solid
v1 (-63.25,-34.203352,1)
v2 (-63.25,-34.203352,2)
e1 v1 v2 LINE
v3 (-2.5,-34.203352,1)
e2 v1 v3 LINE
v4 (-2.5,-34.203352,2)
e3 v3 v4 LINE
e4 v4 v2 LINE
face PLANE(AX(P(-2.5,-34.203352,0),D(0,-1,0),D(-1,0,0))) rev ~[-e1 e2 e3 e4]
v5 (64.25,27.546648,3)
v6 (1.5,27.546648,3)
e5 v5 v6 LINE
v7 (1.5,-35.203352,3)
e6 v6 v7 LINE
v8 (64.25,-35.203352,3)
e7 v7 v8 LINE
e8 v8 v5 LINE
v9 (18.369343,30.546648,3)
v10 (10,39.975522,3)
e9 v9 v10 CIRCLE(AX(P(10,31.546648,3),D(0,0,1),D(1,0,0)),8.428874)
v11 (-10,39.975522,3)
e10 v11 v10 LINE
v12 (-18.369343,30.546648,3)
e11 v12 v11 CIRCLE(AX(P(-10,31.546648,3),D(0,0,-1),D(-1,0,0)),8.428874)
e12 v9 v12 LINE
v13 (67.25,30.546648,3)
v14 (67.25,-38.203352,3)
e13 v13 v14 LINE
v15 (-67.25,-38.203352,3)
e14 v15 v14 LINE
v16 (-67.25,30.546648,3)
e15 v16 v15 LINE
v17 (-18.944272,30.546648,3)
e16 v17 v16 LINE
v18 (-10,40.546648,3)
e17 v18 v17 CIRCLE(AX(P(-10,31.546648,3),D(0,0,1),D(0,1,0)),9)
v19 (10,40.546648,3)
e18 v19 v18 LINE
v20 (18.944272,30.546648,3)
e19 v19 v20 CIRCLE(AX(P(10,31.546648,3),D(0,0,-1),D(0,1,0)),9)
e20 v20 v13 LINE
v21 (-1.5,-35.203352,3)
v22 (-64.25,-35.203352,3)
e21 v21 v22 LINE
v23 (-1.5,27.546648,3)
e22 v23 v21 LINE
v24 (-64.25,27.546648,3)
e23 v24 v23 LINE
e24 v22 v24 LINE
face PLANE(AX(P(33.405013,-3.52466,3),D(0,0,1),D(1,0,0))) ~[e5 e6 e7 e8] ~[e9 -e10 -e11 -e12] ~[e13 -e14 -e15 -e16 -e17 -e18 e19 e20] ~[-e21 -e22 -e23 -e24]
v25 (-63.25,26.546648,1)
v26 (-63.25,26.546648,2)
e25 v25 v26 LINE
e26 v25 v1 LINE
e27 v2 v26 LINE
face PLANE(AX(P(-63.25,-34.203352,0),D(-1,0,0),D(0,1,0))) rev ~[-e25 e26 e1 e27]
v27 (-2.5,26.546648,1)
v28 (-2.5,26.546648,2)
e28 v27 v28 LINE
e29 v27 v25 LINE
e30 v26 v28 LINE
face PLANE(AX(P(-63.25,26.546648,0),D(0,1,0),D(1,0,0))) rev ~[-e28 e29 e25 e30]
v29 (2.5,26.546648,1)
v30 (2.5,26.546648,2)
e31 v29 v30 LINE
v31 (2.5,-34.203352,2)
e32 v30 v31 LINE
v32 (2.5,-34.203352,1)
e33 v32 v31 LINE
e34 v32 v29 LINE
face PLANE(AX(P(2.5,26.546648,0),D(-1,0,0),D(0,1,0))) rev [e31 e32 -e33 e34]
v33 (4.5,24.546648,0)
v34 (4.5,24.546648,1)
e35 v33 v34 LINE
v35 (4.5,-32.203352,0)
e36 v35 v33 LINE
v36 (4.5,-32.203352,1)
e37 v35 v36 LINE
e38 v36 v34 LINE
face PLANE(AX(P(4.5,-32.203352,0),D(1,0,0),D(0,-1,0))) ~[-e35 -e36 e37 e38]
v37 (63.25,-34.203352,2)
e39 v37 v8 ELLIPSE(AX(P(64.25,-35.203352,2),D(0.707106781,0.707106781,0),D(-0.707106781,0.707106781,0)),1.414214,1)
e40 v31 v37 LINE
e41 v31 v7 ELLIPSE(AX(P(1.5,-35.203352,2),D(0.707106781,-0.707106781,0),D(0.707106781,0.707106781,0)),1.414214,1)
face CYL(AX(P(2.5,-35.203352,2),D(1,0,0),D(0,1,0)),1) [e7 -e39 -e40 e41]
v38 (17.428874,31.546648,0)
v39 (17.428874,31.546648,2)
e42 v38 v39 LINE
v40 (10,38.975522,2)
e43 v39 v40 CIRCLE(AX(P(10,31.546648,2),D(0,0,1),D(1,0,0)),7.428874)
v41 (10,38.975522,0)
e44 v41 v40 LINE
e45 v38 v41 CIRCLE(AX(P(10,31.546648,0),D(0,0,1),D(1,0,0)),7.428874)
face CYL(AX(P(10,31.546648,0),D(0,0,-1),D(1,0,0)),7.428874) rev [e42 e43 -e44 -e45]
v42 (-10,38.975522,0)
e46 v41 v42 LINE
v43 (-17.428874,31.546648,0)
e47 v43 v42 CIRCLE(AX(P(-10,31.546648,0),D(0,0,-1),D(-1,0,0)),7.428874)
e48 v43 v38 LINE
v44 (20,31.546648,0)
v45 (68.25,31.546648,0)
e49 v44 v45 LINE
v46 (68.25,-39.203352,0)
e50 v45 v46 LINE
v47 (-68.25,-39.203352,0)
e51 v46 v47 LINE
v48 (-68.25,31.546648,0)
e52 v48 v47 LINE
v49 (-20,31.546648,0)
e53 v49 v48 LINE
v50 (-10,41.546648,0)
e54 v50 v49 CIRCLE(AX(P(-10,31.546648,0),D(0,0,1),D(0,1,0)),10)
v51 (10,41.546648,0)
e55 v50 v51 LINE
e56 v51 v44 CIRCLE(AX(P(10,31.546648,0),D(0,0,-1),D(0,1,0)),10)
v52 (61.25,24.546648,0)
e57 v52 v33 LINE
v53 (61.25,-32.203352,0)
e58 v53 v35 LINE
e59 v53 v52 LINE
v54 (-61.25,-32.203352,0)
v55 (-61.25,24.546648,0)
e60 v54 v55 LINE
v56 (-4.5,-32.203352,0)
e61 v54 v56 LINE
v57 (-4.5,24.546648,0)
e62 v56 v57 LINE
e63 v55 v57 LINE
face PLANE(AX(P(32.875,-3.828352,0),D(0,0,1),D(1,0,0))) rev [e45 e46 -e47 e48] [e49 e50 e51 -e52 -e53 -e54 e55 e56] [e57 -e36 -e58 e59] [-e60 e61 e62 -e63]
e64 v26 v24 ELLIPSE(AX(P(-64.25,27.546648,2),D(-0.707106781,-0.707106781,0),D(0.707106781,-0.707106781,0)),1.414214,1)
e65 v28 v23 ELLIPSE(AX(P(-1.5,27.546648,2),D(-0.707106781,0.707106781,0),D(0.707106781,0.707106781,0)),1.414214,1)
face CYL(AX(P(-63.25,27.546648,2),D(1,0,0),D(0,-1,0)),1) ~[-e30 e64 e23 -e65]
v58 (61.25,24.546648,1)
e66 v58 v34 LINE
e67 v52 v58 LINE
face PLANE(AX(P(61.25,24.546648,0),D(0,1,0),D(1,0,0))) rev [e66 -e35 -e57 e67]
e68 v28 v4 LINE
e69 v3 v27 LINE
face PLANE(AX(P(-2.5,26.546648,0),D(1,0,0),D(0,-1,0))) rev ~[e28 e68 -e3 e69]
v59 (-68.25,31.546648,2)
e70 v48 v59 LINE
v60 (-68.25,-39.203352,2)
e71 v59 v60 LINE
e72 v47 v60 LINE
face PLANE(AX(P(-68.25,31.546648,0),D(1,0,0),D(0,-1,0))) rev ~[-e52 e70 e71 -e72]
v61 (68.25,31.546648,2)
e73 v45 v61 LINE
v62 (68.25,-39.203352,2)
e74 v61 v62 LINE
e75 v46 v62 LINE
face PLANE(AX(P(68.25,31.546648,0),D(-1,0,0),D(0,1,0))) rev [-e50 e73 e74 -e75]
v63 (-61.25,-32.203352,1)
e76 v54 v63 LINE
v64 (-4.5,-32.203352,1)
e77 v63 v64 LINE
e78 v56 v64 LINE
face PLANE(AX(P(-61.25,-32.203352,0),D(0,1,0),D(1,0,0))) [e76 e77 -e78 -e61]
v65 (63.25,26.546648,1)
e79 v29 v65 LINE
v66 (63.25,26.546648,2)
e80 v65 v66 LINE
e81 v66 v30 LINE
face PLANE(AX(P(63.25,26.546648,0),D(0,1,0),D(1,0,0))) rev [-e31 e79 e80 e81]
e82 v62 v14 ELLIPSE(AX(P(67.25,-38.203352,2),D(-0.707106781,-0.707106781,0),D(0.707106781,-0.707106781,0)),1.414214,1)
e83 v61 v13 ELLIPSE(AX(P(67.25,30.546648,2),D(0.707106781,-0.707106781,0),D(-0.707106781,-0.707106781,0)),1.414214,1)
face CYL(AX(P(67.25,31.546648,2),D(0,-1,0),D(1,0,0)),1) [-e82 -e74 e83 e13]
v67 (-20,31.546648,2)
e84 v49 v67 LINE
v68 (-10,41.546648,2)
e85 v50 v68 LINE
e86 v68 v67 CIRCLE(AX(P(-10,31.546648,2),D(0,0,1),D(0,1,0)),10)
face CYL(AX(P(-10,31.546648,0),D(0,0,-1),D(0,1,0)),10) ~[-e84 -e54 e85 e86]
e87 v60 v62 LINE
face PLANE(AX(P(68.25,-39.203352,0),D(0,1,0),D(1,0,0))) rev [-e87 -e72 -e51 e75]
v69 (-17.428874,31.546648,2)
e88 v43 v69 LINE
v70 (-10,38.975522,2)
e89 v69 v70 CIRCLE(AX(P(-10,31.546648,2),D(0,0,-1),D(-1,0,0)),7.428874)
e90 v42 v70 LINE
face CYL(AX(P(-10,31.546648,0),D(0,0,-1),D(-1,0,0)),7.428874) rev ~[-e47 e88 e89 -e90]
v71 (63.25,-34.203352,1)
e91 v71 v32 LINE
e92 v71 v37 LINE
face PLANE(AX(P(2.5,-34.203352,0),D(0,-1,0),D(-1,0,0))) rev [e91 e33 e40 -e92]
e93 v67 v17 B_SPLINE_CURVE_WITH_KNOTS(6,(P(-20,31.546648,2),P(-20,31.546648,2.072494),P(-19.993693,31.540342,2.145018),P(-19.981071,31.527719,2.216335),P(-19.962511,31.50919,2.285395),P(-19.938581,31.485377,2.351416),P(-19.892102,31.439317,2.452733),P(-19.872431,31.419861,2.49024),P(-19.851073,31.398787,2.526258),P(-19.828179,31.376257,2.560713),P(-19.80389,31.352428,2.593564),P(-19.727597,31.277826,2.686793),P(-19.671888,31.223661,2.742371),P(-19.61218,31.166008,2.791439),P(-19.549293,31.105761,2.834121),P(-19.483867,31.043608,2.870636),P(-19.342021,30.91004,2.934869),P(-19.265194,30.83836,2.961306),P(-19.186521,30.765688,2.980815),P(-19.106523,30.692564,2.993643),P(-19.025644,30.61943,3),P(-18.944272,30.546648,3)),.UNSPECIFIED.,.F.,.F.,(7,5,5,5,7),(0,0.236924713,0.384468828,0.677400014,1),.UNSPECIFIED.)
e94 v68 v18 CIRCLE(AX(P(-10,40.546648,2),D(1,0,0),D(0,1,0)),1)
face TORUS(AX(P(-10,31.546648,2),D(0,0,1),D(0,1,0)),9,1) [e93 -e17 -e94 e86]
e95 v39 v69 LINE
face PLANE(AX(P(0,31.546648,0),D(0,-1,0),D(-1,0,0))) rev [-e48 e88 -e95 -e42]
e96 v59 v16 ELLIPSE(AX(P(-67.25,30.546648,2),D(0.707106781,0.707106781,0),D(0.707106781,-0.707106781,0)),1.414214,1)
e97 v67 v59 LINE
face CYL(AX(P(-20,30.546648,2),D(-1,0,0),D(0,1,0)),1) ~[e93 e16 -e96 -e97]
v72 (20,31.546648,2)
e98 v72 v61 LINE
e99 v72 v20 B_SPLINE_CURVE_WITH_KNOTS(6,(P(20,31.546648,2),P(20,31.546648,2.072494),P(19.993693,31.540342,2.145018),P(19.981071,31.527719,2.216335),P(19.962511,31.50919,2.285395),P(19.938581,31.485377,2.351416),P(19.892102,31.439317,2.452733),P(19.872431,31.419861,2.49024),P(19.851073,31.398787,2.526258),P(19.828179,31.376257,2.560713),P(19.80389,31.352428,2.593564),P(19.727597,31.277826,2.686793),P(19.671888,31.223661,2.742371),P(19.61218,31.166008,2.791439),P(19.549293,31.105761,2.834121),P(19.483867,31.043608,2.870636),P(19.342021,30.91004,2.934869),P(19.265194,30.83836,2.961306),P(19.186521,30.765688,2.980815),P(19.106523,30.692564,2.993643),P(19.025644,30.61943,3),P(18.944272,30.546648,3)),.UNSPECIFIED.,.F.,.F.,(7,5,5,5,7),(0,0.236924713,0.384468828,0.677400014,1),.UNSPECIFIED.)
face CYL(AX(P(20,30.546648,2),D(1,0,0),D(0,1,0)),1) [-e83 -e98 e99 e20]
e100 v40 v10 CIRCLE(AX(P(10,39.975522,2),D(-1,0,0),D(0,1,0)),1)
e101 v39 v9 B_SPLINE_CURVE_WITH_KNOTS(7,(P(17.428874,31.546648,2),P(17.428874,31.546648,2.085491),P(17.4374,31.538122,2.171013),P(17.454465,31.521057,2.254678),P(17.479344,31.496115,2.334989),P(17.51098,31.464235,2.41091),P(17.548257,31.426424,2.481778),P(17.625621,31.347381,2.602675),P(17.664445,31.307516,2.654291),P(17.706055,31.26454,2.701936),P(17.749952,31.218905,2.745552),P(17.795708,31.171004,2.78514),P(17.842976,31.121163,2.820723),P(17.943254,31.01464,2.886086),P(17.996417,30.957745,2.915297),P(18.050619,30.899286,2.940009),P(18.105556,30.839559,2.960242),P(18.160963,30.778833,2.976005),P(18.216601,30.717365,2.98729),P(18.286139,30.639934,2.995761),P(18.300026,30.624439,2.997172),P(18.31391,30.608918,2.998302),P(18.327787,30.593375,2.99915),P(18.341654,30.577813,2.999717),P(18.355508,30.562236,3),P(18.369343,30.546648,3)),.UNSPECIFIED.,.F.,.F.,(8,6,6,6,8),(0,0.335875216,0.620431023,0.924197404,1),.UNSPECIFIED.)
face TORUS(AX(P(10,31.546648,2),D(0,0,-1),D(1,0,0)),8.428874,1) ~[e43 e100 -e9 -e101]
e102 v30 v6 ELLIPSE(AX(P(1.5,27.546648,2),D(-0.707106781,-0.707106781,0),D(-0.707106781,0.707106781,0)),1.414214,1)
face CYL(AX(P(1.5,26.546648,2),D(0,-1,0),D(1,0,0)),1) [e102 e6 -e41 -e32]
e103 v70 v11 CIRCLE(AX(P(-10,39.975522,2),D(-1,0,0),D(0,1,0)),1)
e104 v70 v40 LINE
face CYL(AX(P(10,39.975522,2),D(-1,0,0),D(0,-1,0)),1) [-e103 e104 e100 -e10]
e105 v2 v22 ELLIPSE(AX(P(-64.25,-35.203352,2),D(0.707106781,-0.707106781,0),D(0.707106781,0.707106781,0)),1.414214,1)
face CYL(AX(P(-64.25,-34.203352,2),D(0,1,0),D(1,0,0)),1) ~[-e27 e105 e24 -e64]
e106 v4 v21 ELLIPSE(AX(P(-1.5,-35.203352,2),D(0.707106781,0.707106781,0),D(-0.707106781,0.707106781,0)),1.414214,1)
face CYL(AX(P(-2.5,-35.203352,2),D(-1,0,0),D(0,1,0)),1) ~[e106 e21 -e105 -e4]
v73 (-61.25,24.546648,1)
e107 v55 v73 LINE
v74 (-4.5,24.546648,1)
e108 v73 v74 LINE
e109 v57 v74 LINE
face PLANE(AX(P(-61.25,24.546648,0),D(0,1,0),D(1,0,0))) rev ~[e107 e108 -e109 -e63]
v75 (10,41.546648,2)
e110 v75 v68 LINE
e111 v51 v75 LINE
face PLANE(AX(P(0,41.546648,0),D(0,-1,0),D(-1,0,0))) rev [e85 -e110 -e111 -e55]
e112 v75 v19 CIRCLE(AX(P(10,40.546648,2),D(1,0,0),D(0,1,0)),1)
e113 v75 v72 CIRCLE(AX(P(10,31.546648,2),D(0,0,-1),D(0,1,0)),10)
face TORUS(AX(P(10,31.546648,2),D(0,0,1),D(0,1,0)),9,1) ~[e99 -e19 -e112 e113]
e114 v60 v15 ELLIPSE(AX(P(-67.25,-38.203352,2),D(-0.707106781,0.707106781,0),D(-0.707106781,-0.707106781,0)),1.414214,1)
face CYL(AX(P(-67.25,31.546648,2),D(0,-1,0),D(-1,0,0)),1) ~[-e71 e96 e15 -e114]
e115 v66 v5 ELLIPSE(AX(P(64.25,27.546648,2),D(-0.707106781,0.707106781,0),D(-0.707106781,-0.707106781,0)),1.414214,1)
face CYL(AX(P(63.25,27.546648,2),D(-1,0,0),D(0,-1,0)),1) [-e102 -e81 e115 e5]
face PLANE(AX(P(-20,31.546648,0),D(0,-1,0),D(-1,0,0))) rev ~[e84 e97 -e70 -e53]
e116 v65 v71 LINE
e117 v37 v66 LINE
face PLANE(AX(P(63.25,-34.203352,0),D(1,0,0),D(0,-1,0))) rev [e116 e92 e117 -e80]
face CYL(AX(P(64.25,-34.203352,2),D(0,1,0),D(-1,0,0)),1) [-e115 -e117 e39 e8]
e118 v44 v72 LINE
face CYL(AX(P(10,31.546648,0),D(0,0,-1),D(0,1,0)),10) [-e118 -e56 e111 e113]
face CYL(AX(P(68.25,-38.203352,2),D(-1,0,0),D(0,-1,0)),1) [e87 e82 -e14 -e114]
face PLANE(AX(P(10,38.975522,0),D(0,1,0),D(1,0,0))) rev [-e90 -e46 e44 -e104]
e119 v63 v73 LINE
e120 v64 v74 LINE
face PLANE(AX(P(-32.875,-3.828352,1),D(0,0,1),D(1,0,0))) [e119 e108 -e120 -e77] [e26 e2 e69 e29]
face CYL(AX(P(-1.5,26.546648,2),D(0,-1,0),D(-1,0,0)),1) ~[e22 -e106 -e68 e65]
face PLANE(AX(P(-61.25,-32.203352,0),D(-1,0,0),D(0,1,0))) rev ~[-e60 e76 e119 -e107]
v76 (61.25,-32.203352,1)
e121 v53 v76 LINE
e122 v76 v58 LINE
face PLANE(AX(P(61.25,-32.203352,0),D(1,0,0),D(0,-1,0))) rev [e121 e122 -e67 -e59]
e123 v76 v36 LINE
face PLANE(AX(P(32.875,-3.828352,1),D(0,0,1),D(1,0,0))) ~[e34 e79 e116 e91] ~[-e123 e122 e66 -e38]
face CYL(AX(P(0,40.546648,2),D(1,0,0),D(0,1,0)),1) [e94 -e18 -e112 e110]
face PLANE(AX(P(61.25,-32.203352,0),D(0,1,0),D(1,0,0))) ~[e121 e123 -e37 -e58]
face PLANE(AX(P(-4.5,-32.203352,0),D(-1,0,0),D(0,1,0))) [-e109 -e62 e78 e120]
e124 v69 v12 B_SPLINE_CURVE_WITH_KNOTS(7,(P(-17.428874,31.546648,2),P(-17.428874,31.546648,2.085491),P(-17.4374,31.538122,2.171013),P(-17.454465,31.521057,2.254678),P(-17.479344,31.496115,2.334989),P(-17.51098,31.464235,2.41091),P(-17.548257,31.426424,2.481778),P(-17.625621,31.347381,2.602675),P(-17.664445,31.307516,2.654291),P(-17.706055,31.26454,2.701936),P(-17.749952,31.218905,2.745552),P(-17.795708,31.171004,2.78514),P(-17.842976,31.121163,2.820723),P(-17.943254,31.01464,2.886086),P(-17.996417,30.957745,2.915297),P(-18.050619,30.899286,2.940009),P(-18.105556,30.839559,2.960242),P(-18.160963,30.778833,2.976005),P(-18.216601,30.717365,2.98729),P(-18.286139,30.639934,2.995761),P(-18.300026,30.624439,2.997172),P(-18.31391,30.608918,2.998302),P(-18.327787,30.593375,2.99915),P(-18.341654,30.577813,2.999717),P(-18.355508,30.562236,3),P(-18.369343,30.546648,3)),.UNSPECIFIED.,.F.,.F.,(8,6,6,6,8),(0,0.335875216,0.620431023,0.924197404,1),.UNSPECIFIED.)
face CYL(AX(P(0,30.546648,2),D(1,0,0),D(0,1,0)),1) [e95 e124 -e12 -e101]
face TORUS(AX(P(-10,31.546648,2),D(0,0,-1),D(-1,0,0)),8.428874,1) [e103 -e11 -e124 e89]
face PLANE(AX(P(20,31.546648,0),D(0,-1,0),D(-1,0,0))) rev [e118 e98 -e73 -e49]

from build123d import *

# Parameters (mm, degrees)
F0_W     = 2.5711264648
F0_H     = 5
F1_DEPTH = 3
F0_W_2   = 56.75
F0_H_2   = 56.75
F2_DEPTH = 1
F3_R     = 1


# Not quite as in the source:
# - a feature names something its author has since deleted; it is built from what else it names


with BuildPart() as f1:
    # F0 (on Top) → F1 (new body)
    with BuildSketch(Plane.XY):
        Polygon((-63.25, -34.2033516131), (-63.25, 26.5466483869), (-20, 26.5466483869), (-20, 31.5466483869), (-34.125, 31.5466483869), (-68.25, 31.5466483869), (-68.25, -39.2033516131), (0, -39.2033516131), (0, 31.5466483869), (-17.4288735352, 31.5466483869), (-17.4288735352, 26.5466483869), (-2.5, 26.5466483869), (-2.5, -34.2033516131), align=None)
        with Locations((-18.7144367676, 29.0466483869)):
            Rectangle(F0_W, F0_H)
        with BuildLine():
            ThreePointArc((-10, 41.5466483869), (-17.0710678119, 38.6177161988), (-20, 31.5466483869))
            Line((-20, 31.5466483869), (-17.4288735352, 31.5466483869))
            ThreePointArc((-17.4288735352, 31.5466483869), (-15.2530068533, 36.7996552402), (-10, 38.9755219221))
            Line((-10, 38.9755219221), (0, 38.9755219221))
            Line((0, 38.9755219221), (0, 41.5466483869))
            Line((0, 41.5466483869), (-10, 41.5466483869))
        make_face()
    extrude(amount=F1_DEPTH)

    # F0 (on Top) → F2 (join)
    with BuildSketch(Plane.XY):
        Polygon((-20, 26.5466483869), (-63.25, 26.5466483869), (-63.25, -34.2033516131), (-2.5, -34.2033516131), (-2.5, 26.5466483869), (-17.4288735352, 26.5466483869), align=None)
        with Locations((-32.875, -3.8283516131)):
            Rectangle(F0_W_2, F0_H_2, mode=Mode.SUBTRACT)
    extrude(amount=F2_DEPTH)

    # F3
    f3_edges = [f1.edges().sort_by_distance(p)[0] for p in [
        (-32.875, 26.546648, 3),
        (-63.25, -3.828352, 3),
        (-32.875, -34.203352, 3),
        (-2.5, -3.828352, 3),
        (-68.25, -3.828352, 3),
        (-34.125, -39.203352, 3),
        (-8.714437, 31.546648, 3),
        (-15.253007, 36.799655, 3),
        (-17.071068, 38.617716, 3),
        (-5, 38.975522, 3),
        (-5, 41.546648, 3),
        (-44.125, 31.546648, 3),
    ]]
    fillet(f3_edges, radius=F3_R)

    # F4: F1 across plane


with BuildPart() as f1_1:
    add(f1.part)
    add(f1.part.mirror(Plane.YZ))


solid = f1_1.part
